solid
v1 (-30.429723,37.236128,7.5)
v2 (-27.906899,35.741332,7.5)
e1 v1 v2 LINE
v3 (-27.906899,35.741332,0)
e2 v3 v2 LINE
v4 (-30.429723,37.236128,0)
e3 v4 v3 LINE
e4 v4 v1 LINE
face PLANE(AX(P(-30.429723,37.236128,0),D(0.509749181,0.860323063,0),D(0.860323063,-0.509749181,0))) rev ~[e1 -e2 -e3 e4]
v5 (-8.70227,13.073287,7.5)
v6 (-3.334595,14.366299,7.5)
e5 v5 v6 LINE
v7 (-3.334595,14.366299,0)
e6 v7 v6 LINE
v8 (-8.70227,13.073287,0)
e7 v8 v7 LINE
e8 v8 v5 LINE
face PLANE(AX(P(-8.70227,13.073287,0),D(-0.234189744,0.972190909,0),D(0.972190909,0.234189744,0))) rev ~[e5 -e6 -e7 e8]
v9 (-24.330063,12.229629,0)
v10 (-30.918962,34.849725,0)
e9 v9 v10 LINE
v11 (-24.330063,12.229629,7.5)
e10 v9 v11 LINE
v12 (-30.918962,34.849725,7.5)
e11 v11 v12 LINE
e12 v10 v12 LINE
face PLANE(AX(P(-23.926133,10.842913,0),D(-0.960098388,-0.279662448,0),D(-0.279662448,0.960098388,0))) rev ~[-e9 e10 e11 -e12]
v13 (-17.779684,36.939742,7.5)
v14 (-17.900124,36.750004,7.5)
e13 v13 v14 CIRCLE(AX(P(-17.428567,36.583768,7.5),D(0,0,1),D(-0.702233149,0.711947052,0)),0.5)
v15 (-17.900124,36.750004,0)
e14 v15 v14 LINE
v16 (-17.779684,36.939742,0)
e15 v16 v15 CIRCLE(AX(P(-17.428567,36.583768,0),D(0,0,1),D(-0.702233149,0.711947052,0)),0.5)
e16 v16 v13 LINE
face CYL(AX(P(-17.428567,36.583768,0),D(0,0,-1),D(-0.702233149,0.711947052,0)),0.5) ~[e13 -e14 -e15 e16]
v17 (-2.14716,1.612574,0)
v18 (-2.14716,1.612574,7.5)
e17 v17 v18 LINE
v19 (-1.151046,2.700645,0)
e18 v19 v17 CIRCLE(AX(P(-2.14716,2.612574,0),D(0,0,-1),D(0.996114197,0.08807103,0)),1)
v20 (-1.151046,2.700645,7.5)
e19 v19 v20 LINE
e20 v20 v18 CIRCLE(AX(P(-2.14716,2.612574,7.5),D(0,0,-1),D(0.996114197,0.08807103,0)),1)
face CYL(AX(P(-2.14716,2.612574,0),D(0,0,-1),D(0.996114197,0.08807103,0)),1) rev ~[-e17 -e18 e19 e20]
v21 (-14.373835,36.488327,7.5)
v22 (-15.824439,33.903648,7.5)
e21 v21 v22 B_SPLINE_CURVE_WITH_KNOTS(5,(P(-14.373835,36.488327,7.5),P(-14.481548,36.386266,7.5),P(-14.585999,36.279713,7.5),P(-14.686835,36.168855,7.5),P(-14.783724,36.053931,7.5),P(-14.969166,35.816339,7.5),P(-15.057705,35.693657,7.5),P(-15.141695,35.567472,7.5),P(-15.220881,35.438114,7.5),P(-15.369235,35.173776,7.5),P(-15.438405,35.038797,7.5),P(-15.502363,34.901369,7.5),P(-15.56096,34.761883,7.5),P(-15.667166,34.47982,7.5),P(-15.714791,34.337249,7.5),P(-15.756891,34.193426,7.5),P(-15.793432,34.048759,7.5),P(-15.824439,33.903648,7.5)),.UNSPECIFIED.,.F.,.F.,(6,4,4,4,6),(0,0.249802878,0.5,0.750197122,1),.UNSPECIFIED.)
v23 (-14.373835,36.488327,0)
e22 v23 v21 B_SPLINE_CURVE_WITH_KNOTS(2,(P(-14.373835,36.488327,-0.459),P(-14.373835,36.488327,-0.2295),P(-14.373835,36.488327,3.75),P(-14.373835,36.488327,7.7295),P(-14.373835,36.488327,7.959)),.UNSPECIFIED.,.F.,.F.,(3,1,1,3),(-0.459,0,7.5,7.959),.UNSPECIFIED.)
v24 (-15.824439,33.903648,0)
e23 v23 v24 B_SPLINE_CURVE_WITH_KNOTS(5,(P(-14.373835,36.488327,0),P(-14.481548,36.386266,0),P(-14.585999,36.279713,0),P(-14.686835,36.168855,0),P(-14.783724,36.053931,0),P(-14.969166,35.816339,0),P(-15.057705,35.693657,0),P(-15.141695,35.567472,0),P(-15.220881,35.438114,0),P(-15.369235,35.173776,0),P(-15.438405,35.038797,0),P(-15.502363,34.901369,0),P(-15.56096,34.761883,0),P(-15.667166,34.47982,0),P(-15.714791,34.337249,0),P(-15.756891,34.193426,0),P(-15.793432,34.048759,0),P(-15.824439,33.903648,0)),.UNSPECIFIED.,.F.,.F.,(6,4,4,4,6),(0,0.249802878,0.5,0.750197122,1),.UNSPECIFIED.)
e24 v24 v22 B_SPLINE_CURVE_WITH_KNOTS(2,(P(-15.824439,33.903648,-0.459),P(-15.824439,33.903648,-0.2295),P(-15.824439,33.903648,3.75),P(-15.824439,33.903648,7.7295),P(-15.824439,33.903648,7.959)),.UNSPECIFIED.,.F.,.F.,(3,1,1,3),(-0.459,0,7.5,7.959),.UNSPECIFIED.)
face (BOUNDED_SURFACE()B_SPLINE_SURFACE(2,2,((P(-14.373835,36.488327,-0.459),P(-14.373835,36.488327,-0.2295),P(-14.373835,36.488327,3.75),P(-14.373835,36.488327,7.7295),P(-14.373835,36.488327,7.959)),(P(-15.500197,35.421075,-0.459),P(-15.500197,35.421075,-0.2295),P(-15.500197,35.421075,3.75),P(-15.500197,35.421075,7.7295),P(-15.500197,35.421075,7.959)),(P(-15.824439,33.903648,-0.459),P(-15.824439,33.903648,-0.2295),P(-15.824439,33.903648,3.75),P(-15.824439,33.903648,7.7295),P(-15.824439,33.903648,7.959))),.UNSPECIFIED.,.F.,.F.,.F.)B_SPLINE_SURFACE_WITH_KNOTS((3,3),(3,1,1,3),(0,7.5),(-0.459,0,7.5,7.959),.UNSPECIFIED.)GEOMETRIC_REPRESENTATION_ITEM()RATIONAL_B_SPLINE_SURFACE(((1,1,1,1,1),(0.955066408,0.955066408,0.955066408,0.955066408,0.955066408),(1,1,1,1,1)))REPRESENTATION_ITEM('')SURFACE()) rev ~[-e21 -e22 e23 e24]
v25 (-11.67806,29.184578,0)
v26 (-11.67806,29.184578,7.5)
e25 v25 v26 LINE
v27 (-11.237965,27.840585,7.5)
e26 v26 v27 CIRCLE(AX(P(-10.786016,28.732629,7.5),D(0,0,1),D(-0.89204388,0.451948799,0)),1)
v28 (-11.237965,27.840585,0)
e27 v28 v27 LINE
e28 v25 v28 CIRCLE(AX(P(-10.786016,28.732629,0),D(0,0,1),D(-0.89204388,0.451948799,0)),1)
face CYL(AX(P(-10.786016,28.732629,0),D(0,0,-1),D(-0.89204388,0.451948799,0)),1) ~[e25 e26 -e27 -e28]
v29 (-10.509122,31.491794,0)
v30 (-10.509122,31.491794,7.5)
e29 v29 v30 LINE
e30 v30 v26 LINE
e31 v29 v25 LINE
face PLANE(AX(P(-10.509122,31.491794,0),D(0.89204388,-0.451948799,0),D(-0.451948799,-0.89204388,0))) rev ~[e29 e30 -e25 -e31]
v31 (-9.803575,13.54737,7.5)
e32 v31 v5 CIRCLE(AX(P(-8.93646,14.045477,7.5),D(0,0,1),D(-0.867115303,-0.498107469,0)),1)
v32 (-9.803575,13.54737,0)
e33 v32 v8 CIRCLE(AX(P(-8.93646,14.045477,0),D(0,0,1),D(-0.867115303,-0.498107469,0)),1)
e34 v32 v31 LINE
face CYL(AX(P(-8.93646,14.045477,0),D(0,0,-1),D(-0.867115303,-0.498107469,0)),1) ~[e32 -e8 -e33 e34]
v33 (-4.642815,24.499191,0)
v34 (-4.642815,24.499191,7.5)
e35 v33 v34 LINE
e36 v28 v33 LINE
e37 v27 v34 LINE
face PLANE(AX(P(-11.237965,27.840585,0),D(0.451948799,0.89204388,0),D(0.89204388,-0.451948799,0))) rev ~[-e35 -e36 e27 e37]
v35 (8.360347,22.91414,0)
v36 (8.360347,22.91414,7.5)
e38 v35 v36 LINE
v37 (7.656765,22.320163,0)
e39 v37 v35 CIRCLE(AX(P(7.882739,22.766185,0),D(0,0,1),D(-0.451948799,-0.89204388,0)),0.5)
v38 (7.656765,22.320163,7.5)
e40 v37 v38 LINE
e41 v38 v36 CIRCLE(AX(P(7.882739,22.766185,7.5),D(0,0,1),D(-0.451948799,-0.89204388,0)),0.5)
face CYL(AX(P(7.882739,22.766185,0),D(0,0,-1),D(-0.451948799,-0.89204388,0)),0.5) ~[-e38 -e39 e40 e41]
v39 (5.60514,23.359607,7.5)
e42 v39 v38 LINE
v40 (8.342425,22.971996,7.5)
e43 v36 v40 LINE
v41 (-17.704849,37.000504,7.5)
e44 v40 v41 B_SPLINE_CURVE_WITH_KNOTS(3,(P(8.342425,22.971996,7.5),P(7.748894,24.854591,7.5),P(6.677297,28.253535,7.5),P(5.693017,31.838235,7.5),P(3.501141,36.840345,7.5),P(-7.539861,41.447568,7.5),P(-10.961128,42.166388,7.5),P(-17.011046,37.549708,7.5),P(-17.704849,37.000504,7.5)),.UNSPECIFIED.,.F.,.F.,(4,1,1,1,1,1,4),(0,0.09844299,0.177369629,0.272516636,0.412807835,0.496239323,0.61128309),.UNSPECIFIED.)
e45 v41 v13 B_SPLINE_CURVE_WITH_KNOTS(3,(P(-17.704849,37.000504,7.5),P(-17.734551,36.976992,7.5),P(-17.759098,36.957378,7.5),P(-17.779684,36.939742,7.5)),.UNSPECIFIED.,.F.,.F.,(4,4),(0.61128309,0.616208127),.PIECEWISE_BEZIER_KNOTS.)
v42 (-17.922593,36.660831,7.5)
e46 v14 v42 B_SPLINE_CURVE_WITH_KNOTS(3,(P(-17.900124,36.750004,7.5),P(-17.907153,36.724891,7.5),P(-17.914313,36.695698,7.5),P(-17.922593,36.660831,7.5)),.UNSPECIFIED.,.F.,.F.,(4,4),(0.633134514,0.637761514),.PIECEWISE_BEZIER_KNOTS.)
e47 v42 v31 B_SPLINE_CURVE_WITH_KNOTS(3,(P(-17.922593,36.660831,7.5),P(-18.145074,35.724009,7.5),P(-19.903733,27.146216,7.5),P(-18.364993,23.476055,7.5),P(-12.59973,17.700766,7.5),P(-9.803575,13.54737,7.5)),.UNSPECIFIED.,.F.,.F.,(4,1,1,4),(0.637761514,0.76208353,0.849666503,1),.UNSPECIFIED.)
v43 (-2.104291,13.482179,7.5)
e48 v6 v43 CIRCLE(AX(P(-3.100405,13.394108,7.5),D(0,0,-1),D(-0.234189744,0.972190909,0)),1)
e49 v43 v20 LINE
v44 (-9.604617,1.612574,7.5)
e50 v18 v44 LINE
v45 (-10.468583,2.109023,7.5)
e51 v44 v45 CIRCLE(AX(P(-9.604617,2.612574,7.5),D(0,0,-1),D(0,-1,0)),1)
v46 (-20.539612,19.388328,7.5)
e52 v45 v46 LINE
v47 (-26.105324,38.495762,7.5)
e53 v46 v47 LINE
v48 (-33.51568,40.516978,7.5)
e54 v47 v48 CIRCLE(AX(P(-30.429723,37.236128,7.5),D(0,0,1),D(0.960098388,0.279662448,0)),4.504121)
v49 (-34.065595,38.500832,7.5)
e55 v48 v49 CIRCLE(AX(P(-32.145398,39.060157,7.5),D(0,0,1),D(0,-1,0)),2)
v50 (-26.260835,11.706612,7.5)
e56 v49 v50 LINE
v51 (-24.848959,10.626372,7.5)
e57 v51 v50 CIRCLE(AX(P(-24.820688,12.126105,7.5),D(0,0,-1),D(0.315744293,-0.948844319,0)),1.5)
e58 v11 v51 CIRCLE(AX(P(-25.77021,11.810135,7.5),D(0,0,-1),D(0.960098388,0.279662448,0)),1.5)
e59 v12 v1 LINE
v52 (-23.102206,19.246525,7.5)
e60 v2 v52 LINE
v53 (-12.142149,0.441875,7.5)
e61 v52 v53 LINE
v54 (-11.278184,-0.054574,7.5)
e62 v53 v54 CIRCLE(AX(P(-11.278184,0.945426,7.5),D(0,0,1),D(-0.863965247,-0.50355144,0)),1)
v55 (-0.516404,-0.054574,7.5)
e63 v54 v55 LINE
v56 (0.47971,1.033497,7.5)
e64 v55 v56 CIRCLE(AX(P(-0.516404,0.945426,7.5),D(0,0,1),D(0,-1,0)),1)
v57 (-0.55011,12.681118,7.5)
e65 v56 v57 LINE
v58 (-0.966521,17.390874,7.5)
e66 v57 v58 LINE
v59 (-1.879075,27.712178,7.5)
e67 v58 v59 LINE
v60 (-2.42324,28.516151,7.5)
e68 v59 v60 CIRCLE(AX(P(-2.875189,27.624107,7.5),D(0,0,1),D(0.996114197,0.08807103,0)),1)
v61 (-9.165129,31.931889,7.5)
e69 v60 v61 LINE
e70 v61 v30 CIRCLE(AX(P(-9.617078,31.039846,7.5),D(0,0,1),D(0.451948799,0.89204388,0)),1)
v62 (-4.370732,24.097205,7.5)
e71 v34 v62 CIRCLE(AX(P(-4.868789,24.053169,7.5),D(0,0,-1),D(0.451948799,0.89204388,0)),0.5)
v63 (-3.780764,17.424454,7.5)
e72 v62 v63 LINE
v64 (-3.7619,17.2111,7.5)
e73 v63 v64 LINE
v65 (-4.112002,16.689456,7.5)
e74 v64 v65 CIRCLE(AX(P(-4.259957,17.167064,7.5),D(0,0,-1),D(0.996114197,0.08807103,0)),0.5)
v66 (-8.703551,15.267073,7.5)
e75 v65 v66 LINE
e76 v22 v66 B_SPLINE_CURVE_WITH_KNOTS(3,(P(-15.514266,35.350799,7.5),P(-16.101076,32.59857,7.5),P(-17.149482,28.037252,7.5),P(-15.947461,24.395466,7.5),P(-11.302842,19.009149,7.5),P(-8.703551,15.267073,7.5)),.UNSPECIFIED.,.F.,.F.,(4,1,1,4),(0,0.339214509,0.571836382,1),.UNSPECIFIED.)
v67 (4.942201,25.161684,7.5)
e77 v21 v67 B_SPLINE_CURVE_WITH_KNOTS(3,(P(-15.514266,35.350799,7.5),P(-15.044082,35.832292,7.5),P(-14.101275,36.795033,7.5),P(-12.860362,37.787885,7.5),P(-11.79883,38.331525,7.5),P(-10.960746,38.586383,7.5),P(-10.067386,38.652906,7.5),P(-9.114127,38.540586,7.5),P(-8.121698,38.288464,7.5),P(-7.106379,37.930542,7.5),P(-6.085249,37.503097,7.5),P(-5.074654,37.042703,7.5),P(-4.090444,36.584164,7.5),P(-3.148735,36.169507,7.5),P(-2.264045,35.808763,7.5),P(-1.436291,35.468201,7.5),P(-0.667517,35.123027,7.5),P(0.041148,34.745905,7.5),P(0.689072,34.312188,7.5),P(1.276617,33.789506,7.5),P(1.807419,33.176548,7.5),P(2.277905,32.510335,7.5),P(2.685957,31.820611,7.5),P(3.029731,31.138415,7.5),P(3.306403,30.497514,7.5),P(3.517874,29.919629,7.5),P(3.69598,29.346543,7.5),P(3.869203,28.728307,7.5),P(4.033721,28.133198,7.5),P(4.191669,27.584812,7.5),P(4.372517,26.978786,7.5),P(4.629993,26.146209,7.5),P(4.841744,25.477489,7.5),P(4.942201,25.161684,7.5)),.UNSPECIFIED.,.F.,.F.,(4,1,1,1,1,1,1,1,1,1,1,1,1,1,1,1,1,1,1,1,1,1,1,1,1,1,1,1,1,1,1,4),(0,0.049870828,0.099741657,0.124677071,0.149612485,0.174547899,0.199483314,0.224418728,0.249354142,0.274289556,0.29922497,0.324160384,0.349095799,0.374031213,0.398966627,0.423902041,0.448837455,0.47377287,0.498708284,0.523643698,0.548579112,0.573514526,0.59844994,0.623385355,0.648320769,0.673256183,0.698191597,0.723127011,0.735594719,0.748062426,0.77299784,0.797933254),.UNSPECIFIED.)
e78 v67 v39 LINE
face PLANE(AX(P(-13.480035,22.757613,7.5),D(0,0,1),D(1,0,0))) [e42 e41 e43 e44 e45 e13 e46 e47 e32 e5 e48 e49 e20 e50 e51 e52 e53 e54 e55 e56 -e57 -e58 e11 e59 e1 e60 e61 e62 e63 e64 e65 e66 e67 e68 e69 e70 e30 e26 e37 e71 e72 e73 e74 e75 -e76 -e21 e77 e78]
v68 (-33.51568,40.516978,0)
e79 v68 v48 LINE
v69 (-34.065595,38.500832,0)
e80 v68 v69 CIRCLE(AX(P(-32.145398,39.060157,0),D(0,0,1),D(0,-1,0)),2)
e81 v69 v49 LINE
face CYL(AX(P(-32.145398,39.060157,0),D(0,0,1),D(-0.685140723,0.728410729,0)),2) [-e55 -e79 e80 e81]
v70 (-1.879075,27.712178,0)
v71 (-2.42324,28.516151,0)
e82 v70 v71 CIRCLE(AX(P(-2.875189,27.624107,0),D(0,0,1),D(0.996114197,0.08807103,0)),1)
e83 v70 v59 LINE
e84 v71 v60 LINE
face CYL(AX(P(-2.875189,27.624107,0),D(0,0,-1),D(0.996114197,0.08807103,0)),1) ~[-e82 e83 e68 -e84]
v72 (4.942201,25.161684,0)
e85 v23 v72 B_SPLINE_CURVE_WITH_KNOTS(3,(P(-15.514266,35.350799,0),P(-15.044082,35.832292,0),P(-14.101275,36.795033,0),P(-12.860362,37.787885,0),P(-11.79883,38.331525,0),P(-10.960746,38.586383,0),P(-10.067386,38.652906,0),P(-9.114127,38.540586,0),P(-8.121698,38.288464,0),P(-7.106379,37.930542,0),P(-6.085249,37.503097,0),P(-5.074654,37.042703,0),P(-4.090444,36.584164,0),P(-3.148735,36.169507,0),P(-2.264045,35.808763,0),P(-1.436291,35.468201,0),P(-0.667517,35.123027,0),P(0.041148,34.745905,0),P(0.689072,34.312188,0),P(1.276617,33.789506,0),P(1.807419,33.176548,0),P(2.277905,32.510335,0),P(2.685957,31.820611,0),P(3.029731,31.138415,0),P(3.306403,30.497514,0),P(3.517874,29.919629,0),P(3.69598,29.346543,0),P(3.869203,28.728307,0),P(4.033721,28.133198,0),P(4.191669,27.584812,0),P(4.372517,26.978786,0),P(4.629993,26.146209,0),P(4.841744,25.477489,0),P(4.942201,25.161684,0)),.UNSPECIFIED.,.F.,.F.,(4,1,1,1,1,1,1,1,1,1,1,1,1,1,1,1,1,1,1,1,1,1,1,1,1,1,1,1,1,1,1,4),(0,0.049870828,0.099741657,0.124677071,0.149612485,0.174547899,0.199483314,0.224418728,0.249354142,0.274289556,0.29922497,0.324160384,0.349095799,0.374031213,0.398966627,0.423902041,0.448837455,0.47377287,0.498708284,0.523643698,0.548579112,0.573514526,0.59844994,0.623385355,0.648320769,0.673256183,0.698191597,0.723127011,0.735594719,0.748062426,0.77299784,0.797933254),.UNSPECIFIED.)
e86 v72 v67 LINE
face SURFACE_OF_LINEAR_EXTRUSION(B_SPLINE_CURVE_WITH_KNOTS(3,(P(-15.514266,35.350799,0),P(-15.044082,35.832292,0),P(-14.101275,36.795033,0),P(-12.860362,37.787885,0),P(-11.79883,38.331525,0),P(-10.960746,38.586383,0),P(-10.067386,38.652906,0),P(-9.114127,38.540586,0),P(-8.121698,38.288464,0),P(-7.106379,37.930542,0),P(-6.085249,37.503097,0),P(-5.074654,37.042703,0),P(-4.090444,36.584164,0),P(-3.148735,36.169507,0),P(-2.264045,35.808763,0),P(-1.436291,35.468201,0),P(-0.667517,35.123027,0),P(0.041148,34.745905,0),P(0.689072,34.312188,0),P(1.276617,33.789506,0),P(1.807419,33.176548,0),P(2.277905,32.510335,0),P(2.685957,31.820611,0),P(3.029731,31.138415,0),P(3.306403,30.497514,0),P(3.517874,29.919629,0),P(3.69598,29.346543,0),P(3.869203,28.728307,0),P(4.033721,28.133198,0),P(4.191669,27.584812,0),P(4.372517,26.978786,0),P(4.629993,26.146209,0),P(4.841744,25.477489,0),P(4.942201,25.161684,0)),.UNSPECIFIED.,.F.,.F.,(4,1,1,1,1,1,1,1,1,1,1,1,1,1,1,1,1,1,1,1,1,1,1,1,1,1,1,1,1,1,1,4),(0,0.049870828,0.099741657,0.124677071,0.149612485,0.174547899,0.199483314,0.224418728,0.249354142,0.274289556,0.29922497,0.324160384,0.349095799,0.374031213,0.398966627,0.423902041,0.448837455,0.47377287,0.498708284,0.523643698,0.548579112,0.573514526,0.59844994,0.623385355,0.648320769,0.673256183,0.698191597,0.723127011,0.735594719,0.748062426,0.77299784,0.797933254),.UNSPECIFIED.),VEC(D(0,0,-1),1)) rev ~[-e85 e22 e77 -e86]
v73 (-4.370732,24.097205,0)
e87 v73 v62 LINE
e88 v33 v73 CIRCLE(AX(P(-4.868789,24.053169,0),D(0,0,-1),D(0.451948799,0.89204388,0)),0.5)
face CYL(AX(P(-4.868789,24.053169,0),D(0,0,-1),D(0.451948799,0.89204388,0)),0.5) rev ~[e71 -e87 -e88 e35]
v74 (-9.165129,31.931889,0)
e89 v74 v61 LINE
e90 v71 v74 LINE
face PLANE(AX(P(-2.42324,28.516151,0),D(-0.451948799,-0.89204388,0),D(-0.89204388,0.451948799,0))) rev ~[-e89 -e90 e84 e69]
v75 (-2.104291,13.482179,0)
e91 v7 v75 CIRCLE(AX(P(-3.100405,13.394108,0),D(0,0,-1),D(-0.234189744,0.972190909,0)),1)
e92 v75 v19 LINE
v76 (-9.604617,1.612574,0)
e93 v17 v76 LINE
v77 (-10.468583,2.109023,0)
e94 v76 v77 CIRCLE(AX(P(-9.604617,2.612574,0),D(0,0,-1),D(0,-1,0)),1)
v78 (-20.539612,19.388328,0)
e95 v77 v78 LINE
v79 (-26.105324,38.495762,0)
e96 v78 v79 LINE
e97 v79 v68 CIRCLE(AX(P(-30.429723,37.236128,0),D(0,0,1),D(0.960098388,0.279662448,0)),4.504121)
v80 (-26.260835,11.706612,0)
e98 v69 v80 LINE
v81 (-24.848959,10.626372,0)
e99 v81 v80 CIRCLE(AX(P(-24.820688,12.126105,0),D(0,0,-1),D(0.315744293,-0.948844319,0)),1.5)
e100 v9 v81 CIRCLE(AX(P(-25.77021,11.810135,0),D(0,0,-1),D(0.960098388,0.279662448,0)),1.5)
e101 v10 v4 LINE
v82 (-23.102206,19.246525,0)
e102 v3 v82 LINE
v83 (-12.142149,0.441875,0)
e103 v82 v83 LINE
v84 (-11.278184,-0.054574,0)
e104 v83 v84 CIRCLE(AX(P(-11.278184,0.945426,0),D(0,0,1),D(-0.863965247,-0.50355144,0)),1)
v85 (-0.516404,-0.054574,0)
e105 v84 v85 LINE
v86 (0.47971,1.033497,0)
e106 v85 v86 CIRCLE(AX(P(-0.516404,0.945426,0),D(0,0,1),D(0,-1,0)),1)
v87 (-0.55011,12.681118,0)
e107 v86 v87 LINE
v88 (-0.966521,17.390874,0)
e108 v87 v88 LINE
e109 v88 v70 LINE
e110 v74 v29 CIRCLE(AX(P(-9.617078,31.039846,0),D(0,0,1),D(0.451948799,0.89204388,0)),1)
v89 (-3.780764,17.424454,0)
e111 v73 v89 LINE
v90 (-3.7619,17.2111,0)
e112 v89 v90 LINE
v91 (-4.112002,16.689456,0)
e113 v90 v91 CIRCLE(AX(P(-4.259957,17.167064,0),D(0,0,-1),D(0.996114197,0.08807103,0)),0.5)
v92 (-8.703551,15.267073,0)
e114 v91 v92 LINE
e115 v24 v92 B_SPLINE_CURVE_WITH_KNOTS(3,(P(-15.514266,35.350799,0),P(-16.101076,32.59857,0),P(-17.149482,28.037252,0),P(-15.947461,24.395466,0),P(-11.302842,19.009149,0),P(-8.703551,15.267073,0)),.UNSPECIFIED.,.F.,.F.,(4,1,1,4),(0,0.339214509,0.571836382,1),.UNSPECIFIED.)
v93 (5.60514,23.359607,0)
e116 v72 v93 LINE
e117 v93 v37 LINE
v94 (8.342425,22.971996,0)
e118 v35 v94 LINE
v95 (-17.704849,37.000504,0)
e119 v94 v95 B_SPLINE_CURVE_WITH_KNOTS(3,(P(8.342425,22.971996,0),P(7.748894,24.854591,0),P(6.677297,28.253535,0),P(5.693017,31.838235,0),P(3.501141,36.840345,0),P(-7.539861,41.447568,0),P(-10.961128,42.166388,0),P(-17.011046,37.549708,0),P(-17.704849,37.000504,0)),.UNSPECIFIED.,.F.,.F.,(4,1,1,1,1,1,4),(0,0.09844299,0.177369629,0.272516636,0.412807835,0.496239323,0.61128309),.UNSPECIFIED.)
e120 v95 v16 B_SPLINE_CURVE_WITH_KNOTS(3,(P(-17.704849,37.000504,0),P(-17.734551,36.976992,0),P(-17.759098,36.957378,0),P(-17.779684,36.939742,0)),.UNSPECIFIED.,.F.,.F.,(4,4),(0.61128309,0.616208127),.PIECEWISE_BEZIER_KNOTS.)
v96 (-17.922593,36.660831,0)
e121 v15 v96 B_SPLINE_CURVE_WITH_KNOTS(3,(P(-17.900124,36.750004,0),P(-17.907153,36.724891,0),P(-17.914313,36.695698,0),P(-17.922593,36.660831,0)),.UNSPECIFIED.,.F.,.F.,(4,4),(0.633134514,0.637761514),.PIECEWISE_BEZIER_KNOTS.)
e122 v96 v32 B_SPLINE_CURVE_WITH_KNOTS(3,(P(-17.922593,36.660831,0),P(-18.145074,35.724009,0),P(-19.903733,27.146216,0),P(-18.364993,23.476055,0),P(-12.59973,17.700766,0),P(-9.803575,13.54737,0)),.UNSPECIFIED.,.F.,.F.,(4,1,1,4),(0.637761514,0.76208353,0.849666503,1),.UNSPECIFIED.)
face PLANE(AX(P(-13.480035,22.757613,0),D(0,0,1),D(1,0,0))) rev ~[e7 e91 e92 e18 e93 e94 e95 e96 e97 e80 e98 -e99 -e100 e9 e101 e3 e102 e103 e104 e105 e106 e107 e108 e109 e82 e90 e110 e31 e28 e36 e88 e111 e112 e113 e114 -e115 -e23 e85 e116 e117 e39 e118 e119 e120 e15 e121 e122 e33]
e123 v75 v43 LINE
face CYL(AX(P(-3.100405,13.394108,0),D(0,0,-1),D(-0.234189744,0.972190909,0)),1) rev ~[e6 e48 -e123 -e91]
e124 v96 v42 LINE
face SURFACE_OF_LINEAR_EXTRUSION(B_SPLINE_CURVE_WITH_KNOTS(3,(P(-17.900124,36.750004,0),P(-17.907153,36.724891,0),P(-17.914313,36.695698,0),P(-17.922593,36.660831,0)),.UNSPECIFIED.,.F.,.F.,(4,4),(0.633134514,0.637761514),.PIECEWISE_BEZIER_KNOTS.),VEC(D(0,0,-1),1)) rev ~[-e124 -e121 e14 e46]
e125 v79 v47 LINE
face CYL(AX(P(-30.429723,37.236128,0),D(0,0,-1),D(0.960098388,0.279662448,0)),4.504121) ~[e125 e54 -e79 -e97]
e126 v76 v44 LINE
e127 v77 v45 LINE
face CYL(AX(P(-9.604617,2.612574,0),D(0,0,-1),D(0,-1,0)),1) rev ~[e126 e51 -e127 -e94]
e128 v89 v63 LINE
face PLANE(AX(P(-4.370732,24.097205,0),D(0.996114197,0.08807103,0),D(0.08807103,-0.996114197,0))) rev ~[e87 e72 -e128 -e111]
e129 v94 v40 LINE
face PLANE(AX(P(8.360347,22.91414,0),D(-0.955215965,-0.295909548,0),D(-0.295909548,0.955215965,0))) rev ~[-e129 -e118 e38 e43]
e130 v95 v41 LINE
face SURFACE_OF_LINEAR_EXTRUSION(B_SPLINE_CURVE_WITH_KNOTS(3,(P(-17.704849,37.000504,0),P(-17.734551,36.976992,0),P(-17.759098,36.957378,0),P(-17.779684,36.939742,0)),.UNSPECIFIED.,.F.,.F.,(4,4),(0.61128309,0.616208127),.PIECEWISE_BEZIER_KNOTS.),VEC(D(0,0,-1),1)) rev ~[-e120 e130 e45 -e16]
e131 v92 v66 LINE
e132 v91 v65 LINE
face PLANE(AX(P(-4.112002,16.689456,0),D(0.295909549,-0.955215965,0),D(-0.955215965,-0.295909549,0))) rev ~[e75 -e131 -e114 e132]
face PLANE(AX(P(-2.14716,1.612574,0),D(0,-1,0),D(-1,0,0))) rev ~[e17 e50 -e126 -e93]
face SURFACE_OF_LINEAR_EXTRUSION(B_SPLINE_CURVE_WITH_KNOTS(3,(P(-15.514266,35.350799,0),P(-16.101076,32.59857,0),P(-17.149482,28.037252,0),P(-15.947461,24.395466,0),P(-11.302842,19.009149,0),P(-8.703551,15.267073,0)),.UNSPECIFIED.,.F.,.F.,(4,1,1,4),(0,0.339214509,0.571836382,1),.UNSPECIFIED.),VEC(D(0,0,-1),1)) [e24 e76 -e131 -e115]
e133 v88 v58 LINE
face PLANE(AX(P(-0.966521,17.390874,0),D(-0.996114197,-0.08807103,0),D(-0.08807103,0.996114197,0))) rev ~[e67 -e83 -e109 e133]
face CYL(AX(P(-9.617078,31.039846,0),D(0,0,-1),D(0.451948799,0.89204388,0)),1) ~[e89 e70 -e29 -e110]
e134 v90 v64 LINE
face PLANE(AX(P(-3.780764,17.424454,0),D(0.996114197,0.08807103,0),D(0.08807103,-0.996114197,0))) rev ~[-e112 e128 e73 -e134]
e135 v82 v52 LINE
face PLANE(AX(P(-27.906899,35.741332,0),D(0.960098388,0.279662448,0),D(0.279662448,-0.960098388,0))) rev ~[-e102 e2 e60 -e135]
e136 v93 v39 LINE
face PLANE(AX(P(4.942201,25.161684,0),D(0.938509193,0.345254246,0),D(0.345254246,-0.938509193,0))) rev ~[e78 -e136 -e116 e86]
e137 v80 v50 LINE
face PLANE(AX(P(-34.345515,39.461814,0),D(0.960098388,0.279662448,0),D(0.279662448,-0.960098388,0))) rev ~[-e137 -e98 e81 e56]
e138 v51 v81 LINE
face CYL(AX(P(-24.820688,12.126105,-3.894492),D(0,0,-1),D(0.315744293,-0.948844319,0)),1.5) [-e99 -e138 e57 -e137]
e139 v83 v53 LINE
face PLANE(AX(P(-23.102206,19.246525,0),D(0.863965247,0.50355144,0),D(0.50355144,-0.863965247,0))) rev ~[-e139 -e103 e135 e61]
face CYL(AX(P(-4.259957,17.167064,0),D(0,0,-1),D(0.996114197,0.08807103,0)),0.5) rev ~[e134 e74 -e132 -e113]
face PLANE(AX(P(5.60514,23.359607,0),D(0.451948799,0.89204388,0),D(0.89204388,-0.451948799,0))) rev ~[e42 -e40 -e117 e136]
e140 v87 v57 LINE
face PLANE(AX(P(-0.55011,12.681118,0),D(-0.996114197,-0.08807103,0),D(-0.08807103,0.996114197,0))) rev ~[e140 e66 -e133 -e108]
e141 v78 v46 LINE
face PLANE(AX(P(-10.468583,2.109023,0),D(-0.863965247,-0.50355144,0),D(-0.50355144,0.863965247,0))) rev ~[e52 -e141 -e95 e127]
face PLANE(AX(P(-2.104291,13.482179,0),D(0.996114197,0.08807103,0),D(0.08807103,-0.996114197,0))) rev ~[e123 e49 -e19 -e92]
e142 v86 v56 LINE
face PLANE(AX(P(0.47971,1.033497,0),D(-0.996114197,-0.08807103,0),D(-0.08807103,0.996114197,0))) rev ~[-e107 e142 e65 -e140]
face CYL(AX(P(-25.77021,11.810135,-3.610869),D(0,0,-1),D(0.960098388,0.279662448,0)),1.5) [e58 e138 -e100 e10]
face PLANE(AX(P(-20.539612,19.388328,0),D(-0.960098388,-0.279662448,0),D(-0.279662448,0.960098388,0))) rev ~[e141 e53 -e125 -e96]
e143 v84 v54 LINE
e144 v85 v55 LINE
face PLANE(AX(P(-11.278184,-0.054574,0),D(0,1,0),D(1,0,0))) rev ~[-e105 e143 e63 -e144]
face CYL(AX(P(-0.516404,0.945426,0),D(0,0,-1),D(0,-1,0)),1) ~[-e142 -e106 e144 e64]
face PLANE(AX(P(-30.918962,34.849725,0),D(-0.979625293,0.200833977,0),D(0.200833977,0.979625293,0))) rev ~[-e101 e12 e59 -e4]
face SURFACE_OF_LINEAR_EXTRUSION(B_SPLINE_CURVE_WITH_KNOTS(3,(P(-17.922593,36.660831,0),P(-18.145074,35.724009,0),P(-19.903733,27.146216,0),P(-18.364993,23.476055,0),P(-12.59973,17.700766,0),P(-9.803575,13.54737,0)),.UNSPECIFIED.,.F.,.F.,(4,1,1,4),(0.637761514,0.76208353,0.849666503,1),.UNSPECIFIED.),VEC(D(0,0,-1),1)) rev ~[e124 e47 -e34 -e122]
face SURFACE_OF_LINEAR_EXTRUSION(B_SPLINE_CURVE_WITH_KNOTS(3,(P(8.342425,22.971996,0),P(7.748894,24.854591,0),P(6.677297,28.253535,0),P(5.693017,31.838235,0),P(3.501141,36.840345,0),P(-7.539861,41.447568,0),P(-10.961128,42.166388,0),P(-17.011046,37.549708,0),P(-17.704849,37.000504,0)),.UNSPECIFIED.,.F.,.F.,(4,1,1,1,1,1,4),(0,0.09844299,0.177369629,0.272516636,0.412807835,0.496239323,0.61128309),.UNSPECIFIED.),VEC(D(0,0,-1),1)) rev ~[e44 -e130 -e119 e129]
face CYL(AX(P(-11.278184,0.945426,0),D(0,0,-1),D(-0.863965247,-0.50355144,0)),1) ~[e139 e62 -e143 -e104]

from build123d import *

# Parameters (mm, degrees)
F1_DEPTH    = 7.5
F2_T1_DEPTH = 15.2889844522
F2_T3_DEPTH = 14.7217373581
F3_R        = 5
F4_R        = 2


# Not quite as in the source:
# - a fillet or chamfer that OpenCascade refuses, or shapes differently, is made with other operations: its cross-section is extruded or revolved along the edge and cut away or added
# - the dataset's text gives a spline's control points without its knots; the knots are read off the source's solid


with BuildPart() as f1:
    # F0 (on Top) → F1 (new body)
    with BuildSketch(Plane.XY):
        with BuildLine():
            Line((-30.4297231978, 37.2361281484), (-27.9068994648, 35.7413323143))
            Line((-27.9068994648, 35.7413323143), (-23.1022062055, 19.2465248053))
            Line((-23.1022062055, 19.2465248053), (-12.1421488415, 0.4418746424))
            ThreePointArc((-12.1421488415, 0.4418746424), (-11.7764047105, 0.0783760722), (-11.2781835948, -0.0545739178))
            Line((-11.2781835948, -0.0545739178), (-0.5164044179, -0.0545739178))
            ThreePointArc((-0.5164044179, -0.0545739178), (0.2211832141, 0.2701746585), (0.4797097793, 1.0334971119))
            Line((0.4797097793, 1.0334971119), (-0.5501098771, 12.6811181757))
            Line((-0.5501098771, 12.6811181757), (-0.9665210168, 17.3908740359))
            Line((-0.9665210168, 17.3908740359), (-1.8790748935, 27.7121780525))
            ThreePointArc((-1.8790748935, 27.7121780525), (-2.0470497932, 28.1846293722), (-2.4232402919, 28.5161509026))
            Line((-2.4232402919, 28.5161509026), (-9.1651293115, 31.931889425))
            ThreePointArc((-9.1651293115, 31.931889425), (-9.9282723264, 31.9901918821), (-10.50912199, 31.4917943441))
            Line((-10.50912199, 31.4917943441), (-11.6780597733, 29.1845776897))
            ThreePointArc((-11.6780597733, 29.1845776897), (-11.7363622304, 28.4214346748), (-11.2379646923, 27.8405850112))
            Line((-11.2379646923, 27.8405850112), (-4.6428148812, 24.499191048))
            ThreePointArc((-4.6428148812, 24.499191048), (-4.4547196319, 24.3334302828), (-4.370732182, 24.097204623))
            Line((-4.370732182, 24.097204623), (-3.7807636833, 17.4244542335))
            Line((-3.7807636833, 17.4244542335), (-3.7619000234, 17.2110996318))
            ThreePointArc((-3.7619000234, 17.2110996318), (-3.8447935162, 16.8884260354), (-4.1120023476, 16.6894561347))
            Line((-4.1120023476, 16.6894561347), (-8.7035508168, 15.2670730452))
            add(Edge.make_bspline(
                [(-15.5142657673, 35.3507988058), (-16.1010755157, 32.5985703523), (-17.1494817729, 28.0372519615), (-15.947461142, 24.3954661972), (-11.3028420672, 19.0091491745), (-8.7035508168, 15.2670730452)],
                knots=[0, 0, 0, 0, 0.3392145091, 0.5718363816, 1, 1, 1, 1], degree=3))
            add(Edge.make_bspline(
                [(-15.5142657673, 35.3507988058), (-15.0440821248, 35.8322924551), (-14.1012745944, 36.7950332484), (-12.8603615018, 37.7878852095), (-11.798829502, 38.3315249945), (-10.960746448, 38.5863831942), (-10.0673858916, 38.6529058616), (-9.1141266995, 38.5405856329), (-8.1216983172, 38.2884636716), (-7.1063789778, 37.9305416741), (-6.0852486156, 37.5030969594), (-5.0746543782, 37.0427025856), (-4.0904435755, 36.5841639606), (-3.1487348398, 36.1695070149), (-2.2640452318, 35.8087630666), (-1.4362912989, 35.4682005173), (-0.667516675, 35.1230266013), (0.0411482358, 34.745905475), (0.6890718757, 34.31218751), (1.2766173569, 33.7895061105), (1.8074190243, 33.1765478565), (2.2779053445, 32.5103349131), (2.6859571098, 31.8206108547), (3.0297312381, 31.1384148993), (3.3064025308, 30.4975143414), (3.5178737246, 29.9196286172), (3.6959800621, 29.3465425456), (3.8692027201, 28.7283066119), (4.0337210144, 28.1331983491), (4.1916693597, 27.5848116783), (4.3725168618, 26.9787861335), (4.6299932224, 26.1462091657), (4.8417441396, 25.4774887899), (4.9422006393, 25.1616837102)],
                knots=[0, 0, 0, 0, 0.0498708284, 0.0997416568, 0.1246770709, 0.1496124851, 0.1745478993, 0.1994833135, 0.2244187277, 0.2493541419, 0.2742895561, 0.2992249703, 0.3241603844, 0.3490957986, 0.3740312128, 0.398966627, 0.4239020412, 0.4488374554, 0.4737728696, 0.4987082838, 0.5236436979, 0.5485791121, 0.5735145263, 0.5984499405, 0.6233853547, 0.6483207689, 0.6732561831, 0.6981915973, 0.7231270114, 0.7355947185, 0.7480624256, 0.7729978398, 0.797933254, 0.797933254, 0.797933254, 0.797933254], degree=3))
            Line((4.9422006393, 25.1616837102), (5.6051399225, 23.3596070707))
            Line((5.6051399225, 23.3596070707), (7.6567647722, 22.3201633759))
            ThreePointArc((7.6567647722, 22.3201633759), (8.2052790129, 22.3841276621), (8.3603471538, 22.9141400901))
            Line((8.3603471538, 22.9141400901), (8.3424245162, 22.9719955723))
            add(Edge.make_bspline(
                [(8.3424245162, 22.9719955723), (7.7488944153, 24.8545905089), (6.67729679, 28.253534975), (5.6930167186, 31.8382348733), (3.5011406257, 36.8403453764), (-7.5398608959, 41.4475683268), (-10.9611276957, 42.1663875514), (-17.0110458735, 37.5497083277), (-17.7048493275, 37.0005035791)],
                knots=[0, 0, 0, 0, 0.0984429904, 0.1773696293, 0.2725166361, 0.412807835, 0.4962393226, 0.6112830896, 0.6112830896, 0.6112830896, 0.6112830896], degree=3))
            add(Edge.make_bspline(
                [(-17.7048493275, 37.0005035791), (-17.7345511384, 36.9769920565), (-17.7590976226, 36.9573783291), (-17.7796839194, 36.9397418581)],
                knots=[0.6112830896, 0.6112830896, 0.6112830896, 0.6112830896, 0.6162081274, 0.6162081274, 0.6162081274, 0.6162081274], degree=3))
            ThreePointArc((-17.7796839194, 36.9397418581), (-17.850702418, 36.8517272472), (-17.9001241505, 36.750003645))
            add(Edge.make_bspline(
                [(-17.9001241505, 36.750003645), (-17.907153429, 36.7248909598), (-17.9143126936, 36.695697636), (-17.9225929782, 36.6608311238)],
                knots=[0.6331345136, 0.6331345136, 0.6331345136, 0.6331345136, 0.6377615142, 0.6377615142, 0.6377615142, 0.6377615142], degree=3))
            add(Edge.make_bspline(
                [(-17.9225929782, 36.6608311238), (-18.145074403, 35.7240093049), (-19.9037327351, 27.1462156298), (-18.3649930119, 23.476055144), (-12.5997298189, 17.7007658301), (-9.8035750323, 13.5473699634)],
                knots=[0.6377615142, 0.6377615142, 0.6377615142, 0.6377615142, 0.7620835298, 0.8496665033, 1, 1, 1, 1], degree=3))
            ThreePointArc((-9.8035750323, 13.5473699634), (-9.3318550602, 13.126966392), (-8.7022699851, 13.0732865238))
            Line((-8.7022699851, 13.0732865238), (-3.3345946353, 14.3662985288))
            ThreePointArc((-3.3345946353, 14.3662985288), (-2.5168389495, 14.2061733755), (-2.1042906941, 13.4821786494))
            Line((-2.1042906941, 13.4821786494), (-1.1510458373, 2.7006453938))
            ThreePointArc((-1.1510458373, 2.7006453938), (-1.4095724025, 1.9373229405), (-2.1471600344, 1.6125743641))
            Line((-2.1471600344, 1.6125743641), (-9.6046174943, 1.6125743641))
            ThreePointArc((-9.6046174943, 1.6125743641), (-10.1028386099, 1.7455243541), (-10.468582741, 2.1090229244))
            Line((-10.468582741, 2.1090229244), (-20.5396115367, 19.3883278582))
            Line((-20.5396115367, 19.3883278582), (-26.1053241383, 38.4957615815))
            ThreePointArc((-26.1053241383, 38.4957615815), (-29.9052669683, 41.7096110505), (-34.3455150255, 39.4618141043))
            Line((-34.3455150255, 39.4618141043), (-25.8251781299, 10.2109734327))
            Line((-25.8251781299, 10.2109734327), (-24.8756555892, 10.5269434158))
            Line((-24.8756555892, 10.5269434158), (-23.9261330484, 10.8429133989))
            Line((-23.9261330484, 10.8429133989), (-30.9189620372, 34.8497254653))
            Line((-30.9189620372, 34.8497254653), (-30.4297231978, 37.2361281484))
        make_face()
    extrude(amount=F1_DEPTH)

    # F2: fillet of radius 1.5 on 2 edges, made by hand

    # F2_s2 → F2_t1 (cut)
    with BuildSketch(Plane.XY.offset(-3.8944922261)):
        with BuildLine():
            ThreePointArc((-24.3470714005, 10.7028389106), (-25.5174199076, 10.7977363038), (-26.2608354224, 11.7066117163))
            Line((-26.2608354224, 11.7066117163), (-25.8251781299, 10.2109734327))
            Line((-25.8251781299, 10.2109734327), (-24.3470714005, 10.7028389106))
        make_face()
    extrude(amount=F2_T1_DEPTH, mode=Mode.SUBTRACT)

    # F2_s4 → F2_t3 (cut)
    with BuildSketch(Plane.XY.offset(-3.6108686791)):
        with BuildLine():
            ThreePointArc((-24.3300627987, 12.2296290784), (-24.4418412958, 11.1134033384), (-25.2965939413, 10.3868689275))
            Line((-25.2965939413, 10.3868689275), (-23.9261330484, 10.8429133989))
            Line((-23.9261330484, 10.8429133989), (-24.3300627987, 12.2296290784))
        make_face()
    extrude(amount=F2_T3_DEPTH, mode=Mode.SUBTRACT)

    # F3
    f3_edges = [f1.edges().sort_by_distance(p)[0] for p in [
        (-15.514266, 35.350799, 3.75),
    ]]
    fillet(f3_edges, radius=F3_R)

    # F4
    f4_edges = [f1.edges().sort_by_distance(p)[0] for p in [
        (-34.345515, 39.461814, 3.75),
    ]]
    fillet(f4_edges, radius=F4_R)


solid = f1.part
